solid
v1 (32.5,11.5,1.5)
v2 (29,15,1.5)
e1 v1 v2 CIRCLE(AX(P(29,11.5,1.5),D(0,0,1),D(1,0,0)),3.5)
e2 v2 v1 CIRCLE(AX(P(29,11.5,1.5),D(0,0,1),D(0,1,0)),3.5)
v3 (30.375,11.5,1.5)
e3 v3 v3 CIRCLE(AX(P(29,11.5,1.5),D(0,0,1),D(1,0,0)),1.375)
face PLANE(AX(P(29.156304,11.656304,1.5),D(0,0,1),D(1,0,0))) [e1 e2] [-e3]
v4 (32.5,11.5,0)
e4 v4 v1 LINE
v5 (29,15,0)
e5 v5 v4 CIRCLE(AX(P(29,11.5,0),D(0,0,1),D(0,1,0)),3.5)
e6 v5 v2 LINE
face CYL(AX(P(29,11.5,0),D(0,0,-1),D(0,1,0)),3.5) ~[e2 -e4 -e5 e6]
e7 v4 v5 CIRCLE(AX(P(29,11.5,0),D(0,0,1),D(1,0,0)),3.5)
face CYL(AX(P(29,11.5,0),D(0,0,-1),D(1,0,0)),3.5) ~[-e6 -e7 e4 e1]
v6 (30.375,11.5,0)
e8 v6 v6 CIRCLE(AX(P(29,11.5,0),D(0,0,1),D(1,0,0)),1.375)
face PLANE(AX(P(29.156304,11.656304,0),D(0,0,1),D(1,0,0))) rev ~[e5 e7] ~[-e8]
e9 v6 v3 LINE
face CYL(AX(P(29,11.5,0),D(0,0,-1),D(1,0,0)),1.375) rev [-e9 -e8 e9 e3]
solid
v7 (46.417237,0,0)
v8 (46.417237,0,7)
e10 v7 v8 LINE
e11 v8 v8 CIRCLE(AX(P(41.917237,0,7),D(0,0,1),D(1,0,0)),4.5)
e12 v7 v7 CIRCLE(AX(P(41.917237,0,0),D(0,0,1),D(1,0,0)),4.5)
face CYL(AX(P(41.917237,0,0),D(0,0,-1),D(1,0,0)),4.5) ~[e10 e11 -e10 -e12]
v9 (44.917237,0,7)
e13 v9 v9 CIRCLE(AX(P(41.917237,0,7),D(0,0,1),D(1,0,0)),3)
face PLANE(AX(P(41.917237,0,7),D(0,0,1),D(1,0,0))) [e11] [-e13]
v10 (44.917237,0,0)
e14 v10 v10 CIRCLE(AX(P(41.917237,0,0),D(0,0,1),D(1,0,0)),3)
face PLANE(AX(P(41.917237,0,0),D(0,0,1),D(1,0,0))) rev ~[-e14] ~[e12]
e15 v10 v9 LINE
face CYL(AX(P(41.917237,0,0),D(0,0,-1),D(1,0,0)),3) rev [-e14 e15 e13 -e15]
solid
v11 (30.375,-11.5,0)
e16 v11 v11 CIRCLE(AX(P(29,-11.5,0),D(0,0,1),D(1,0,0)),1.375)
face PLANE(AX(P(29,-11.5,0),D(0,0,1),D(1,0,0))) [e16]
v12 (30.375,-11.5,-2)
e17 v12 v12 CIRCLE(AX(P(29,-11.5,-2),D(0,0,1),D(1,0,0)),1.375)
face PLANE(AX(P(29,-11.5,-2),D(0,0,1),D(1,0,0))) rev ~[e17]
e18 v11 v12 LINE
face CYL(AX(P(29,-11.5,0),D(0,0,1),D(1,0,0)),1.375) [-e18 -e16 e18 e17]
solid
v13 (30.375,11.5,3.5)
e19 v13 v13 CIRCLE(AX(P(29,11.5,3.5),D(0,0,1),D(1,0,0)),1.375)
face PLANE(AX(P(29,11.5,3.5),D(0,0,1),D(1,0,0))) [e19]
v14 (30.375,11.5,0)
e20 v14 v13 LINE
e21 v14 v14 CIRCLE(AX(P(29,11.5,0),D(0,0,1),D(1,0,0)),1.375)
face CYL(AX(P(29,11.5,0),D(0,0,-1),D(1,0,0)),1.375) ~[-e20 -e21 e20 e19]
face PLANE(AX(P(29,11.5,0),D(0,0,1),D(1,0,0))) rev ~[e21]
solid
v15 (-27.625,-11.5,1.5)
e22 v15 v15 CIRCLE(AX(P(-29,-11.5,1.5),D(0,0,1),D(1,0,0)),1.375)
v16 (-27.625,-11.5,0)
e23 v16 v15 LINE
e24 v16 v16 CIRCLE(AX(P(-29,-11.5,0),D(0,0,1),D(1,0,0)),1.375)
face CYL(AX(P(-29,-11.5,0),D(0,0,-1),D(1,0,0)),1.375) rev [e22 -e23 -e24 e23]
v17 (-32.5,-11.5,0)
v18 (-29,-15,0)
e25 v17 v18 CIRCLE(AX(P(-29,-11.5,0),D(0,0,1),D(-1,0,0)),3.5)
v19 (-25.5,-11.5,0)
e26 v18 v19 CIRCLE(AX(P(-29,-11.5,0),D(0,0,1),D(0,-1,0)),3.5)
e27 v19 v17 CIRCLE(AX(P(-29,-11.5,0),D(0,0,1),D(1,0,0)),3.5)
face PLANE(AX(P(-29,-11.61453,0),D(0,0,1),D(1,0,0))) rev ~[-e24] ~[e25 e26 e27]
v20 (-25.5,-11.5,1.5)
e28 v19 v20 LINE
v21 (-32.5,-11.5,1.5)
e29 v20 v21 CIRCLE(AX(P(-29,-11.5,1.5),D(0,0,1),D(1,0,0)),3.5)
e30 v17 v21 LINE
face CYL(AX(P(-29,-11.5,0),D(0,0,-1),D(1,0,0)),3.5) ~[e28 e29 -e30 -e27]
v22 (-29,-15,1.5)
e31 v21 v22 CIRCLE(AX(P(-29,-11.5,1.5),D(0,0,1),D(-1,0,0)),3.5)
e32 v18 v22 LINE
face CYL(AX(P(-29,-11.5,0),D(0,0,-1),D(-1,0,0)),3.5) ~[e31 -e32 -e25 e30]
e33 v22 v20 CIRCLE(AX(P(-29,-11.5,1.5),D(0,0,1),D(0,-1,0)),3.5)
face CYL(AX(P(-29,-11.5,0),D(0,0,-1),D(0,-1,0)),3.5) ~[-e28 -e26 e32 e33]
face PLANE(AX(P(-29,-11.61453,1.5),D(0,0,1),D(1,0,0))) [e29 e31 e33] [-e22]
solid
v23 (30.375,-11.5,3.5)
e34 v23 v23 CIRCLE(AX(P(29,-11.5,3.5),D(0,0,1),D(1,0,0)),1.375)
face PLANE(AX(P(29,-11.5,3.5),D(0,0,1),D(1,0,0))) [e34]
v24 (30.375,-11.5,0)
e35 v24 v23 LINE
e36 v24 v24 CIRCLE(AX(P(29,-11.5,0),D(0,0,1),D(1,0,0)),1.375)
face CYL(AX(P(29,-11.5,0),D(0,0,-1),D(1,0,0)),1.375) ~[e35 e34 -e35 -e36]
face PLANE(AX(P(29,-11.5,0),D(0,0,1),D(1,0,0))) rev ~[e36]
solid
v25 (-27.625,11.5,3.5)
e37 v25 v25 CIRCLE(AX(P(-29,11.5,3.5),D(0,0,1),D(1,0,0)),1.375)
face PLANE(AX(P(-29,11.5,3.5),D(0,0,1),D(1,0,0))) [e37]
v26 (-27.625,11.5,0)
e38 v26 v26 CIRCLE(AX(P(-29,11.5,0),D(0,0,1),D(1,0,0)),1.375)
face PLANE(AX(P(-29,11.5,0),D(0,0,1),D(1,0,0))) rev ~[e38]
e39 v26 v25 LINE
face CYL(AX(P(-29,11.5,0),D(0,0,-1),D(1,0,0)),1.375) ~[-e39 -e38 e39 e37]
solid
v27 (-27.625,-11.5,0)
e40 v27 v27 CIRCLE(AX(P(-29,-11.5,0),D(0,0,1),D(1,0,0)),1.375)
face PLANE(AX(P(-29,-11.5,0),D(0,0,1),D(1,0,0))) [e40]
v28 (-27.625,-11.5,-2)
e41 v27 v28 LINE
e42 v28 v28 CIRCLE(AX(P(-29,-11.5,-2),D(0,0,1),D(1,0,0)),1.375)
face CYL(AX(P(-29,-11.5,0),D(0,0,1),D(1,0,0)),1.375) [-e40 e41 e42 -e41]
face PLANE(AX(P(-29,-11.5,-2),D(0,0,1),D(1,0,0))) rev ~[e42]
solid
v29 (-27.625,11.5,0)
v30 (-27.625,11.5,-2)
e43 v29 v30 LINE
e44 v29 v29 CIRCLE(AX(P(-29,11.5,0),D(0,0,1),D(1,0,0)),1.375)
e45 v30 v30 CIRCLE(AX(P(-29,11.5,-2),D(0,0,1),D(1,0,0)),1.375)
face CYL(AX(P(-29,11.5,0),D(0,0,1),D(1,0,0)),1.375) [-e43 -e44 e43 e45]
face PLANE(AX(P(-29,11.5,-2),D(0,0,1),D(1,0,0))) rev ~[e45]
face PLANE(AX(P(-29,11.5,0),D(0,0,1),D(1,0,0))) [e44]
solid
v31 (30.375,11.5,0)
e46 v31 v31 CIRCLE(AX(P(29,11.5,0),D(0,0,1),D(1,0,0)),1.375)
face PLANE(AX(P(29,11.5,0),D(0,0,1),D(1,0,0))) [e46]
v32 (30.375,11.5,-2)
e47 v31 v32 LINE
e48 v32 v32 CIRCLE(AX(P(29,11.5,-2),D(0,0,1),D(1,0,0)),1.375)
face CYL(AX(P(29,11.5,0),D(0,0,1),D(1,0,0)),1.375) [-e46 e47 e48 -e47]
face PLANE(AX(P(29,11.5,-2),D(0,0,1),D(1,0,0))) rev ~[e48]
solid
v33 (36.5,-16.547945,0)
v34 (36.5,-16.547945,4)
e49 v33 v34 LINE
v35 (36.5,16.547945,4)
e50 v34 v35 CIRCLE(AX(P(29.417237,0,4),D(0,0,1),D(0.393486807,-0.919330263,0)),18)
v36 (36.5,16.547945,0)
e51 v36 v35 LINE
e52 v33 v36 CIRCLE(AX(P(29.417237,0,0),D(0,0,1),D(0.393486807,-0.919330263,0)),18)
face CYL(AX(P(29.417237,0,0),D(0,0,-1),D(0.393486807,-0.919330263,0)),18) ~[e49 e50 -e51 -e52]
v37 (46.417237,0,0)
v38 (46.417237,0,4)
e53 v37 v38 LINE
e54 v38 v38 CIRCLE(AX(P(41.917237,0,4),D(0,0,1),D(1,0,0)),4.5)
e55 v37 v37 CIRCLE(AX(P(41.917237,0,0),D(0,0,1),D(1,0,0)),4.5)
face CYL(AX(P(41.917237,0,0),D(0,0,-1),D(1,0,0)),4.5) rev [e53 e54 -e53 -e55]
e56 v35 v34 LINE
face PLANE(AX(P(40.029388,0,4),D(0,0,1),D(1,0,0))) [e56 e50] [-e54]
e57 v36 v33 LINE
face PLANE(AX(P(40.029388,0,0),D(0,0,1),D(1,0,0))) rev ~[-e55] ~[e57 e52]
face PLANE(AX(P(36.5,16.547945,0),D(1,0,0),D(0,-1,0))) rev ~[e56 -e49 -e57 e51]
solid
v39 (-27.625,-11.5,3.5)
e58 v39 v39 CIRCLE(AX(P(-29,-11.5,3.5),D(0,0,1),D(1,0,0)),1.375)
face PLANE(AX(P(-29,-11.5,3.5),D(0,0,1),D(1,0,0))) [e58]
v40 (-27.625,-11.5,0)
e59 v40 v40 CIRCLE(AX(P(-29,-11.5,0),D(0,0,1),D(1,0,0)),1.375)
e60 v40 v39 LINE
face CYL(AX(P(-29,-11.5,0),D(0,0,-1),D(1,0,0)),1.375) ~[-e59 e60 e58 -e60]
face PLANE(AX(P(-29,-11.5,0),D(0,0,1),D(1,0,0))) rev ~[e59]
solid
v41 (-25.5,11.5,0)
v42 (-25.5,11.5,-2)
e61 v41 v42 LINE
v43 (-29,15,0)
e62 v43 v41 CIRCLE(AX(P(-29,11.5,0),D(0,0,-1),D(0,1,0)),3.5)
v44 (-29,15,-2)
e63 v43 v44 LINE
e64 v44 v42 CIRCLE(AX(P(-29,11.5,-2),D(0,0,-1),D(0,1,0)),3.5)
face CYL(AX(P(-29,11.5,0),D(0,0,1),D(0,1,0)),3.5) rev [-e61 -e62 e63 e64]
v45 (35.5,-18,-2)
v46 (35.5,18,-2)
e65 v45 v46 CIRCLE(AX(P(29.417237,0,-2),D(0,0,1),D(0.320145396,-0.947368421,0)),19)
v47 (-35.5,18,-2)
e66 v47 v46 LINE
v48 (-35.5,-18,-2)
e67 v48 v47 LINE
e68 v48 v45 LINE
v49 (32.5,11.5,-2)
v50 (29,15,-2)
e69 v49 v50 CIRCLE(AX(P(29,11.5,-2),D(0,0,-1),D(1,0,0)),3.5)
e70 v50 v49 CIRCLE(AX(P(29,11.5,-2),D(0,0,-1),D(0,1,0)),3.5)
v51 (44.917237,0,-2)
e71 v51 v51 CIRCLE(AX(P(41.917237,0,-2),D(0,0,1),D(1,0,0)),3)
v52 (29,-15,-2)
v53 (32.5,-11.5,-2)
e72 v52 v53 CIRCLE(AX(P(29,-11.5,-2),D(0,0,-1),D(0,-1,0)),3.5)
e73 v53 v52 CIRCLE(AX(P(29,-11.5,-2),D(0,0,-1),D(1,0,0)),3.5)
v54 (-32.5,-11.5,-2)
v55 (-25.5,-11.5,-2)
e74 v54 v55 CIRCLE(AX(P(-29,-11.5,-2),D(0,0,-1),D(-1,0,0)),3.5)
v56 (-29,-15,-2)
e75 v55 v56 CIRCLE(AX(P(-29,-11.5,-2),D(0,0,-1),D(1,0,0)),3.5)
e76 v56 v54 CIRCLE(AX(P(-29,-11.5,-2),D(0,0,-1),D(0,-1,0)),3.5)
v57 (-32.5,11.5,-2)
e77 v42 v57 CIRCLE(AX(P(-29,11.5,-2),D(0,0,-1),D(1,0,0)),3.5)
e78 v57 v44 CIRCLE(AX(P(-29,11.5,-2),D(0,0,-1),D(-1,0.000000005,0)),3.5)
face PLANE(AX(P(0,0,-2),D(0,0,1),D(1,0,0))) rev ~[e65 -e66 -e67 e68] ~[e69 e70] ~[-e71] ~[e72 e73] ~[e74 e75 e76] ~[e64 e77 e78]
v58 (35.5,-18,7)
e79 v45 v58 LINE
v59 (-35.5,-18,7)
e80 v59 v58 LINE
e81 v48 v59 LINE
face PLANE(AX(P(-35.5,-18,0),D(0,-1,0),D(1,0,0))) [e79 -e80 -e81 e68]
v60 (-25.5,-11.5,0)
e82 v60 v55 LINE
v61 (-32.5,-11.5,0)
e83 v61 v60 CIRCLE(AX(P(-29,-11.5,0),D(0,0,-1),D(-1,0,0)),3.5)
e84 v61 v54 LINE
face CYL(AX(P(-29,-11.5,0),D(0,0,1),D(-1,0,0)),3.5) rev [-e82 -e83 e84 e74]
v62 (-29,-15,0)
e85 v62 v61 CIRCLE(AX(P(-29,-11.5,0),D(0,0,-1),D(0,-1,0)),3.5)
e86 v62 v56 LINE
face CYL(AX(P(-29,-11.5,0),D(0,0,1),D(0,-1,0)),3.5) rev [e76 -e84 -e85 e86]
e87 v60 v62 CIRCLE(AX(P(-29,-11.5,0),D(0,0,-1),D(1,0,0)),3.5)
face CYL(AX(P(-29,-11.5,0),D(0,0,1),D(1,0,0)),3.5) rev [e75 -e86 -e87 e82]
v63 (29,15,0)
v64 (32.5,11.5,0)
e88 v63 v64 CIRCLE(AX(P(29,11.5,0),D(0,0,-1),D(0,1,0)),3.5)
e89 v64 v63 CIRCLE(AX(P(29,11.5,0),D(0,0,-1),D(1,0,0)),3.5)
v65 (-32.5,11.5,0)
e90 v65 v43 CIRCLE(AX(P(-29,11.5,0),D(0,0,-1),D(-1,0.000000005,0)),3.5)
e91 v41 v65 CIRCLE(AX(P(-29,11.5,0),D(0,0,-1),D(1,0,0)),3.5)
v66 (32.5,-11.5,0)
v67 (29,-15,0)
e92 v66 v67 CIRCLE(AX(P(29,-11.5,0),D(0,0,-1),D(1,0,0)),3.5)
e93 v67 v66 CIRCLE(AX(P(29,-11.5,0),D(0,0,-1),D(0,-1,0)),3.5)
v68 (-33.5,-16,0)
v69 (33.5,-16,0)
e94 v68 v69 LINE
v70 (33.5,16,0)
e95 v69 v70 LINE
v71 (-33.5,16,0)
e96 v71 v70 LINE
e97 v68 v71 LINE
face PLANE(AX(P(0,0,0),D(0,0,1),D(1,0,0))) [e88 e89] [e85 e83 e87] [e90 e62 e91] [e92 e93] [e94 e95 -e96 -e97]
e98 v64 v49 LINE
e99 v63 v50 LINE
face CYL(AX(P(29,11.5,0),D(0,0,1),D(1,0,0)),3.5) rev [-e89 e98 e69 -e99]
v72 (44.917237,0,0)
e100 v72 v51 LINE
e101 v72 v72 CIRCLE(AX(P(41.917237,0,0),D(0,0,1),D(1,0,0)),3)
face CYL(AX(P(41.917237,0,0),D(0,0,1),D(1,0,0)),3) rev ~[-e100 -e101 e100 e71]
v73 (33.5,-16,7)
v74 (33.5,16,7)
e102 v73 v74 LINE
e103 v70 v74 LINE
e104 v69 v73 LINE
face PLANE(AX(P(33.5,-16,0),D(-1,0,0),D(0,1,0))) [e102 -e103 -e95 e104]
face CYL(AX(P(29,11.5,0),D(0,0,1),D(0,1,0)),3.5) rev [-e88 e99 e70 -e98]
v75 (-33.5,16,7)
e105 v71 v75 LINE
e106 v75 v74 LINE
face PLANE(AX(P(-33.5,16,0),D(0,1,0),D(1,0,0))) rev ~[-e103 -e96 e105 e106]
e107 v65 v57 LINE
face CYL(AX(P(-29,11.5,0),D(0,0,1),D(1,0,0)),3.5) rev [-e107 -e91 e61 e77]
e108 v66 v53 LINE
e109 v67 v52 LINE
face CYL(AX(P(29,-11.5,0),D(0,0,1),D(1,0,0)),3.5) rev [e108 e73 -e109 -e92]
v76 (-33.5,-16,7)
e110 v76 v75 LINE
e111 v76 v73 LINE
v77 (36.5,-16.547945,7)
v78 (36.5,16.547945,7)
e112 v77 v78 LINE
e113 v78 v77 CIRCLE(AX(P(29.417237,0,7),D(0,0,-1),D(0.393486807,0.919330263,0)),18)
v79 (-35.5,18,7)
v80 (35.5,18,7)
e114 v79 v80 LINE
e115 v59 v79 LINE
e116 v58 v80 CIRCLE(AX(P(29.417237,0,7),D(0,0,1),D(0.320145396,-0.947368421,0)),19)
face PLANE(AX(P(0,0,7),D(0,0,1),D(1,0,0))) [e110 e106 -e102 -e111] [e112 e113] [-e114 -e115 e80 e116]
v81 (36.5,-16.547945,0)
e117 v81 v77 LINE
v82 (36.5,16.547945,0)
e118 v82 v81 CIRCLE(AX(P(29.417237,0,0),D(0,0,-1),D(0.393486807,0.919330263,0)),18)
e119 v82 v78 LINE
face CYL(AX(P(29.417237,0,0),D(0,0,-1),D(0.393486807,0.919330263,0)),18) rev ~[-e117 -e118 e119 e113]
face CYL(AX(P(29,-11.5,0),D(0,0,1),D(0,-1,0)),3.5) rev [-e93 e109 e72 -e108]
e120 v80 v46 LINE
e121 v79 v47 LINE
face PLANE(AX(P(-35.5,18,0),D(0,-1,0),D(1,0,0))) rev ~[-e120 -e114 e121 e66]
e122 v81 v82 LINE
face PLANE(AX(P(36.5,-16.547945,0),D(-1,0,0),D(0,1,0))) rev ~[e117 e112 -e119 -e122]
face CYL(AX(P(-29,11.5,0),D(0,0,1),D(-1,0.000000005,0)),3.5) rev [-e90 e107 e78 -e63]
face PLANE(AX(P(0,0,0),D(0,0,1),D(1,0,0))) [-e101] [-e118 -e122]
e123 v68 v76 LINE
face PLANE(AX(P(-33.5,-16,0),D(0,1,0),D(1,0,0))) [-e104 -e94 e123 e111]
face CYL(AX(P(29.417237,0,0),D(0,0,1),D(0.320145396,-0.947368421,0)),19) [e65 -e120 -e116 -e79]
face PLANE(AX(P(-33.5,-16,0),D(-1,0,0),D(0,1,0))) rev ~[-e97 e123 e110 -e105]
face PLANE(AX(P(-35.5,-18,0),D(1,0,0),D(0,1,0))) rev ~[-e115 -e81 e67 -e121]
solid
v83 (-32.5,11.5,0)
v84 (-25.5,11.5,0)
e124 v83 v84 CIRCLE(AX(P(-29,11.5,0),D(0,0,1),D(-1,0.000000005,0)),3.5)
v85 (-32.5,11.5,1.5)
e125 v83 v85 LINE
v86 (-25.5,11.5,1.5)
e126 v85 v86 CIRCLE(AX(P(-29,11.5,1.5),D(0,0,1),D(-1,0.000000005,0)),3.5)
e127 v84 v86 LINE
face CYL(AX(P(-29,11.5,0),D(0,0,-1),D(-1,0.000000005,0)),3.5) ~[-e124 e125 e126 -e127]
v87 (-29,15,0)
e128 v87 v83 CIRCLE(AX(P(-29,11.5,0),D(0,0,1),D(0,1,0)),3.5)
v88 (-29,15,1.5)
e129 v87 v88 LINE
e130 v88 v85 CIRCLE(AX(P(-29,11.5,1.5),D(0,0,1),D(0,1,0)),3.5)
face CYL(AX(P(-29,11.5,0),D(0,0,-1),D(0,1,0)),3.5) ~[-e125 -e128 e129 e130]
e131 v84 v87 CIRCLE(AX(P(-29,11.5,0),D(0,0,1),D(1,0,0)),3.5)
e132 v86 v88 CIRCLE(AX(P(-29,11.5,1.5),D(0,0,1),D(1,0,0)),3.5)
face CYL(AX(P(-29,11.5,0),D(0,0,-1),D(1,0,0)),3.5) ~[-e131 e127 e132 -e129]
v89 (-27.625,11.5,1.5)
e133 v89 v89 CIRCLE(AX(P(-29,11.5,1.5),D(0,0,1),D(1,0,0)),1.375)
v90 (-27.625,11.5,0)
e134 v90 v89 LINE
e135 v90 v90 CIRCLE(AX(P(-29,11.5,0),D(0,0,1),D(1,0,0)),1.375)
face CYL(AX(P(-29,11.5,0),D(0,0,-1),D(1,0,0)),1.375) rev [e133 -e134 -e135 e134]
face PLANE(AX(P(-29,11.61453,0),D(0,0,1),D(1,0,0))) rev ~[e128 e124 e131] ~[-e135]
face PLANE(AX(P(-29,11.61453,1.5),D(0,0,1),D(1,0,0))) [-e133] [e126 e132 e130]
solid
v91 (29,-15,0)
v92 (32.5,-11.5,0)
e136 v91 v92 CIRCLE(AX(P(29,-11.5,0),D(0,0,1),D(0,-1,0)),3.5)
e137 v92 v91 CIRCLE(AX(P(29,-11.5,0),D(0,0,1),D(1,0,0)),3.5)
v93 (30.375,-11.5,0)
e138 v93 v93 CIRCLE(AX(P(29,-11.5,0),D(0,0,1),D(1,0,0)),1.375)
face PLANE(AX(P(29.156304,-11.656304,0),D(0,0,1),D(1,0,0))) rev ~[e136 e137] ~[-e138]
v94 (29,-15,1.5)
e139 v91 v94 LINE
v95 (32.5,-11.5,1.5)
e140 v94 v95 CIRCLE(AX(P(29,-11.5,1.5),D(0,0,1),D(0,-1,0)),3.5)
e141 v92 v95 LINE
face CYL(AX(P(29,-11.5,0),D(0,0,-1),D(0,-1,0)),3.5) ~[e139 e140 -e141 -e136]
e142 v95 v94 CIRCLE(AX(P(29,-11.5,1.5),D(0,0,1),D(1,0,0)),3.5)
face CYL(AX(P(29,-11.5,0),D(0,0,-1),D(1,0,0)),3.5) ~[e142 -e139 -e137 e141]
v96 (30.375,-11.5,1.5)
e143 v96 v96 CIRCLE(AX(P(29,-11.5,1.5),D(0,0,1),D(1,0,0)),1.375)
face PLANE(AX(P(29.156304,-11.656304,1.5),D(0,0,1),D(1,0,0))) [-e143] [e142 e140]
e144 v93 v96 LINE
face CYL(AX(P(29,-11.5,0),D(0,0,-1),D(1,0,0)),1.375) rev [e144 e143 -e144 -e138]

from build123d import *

# Parameters (mm, degrees)
F0_W     = 71
F0_H     = 36
F0_W_2   = 67
F0_H_2   = 32
F1_DEPTH = 7
F0_R     = 4.5
F0_R_2   = 3
F2_DEPTH = 2
F0_R_3   = 1.375
F3_DEPTH = 3.5
F4_DEPTH = 1.5
F5_DEPTH = 4


with BuildPart() as f1:
    # F0 (on Top) → F1 (new body)
    with BuildSketch(Plane.XY):
        Rectangle(F0_W, F0_H)
        Rectangle(F0_W_2, F0_H_2, mode=Mode.SUBTRACT)
        with BuildLine():
            ThreePointArc((35.5, -18), (48.4172374697, 0), (35.5, 18))
            Line((35.5, 18), (35.5, -18))
        make_face()
        with BuildLine():
            ThreePointArc((36.5, 16.5479447346), (47.4172374697, 0), (36.5, -16.5479447346))
            Line((36.5, -16.5479447346), (36.5, 16.5479447346))
        make_face(mode=Mode.SUBTRACT)
    extrude(amount=F1_DEPTH)

    # F0 (on Top) → F2 (join)
    with BuildSketch(Plane.XY):
        Rectangle(F0_W, F0_H)
        Rectangle(F0_W_2, F0_H_2, mode=Mode.SUBTRACT)
        Rectangle(F0_W_2, F0_H_2)
        Polygon((32.5, -11.5), (32.5, -15), (29, -15), (-29, -15), (-32.5, -15), (-32.5, -11.5), (-32.5, 11.5000000158), (-32.5, 15), (-29, 15), (29, 15), (32.5, 15), (32.5, 11.5), align=None, mode=Mode.SUBTRACT)
        with BuildLine():
            Line((-29, -15), (29, -15))
            ThreePointArc((29, -15), (26.5251262658, -9.0251262658), (32.5, -11.5))
            Line((32.5, -11.5), (32.5, 11.5))
            ThreePointArc((32.5, 11.5), (26.5251262658, 9.0251262658), (29, 15))
            Line((29, 15), (-29, 15))
            ThreePointArc((-29, 15), (-26.5251262658, 13.9748737342), (-25.5, 11.5))
            ThreePointArc((-25.5, 11.5), (-29.0000000079, 8), (-32.5, 11.5000000158))
            Line((-32.5, 11.5000000158), (-32.5, -11.5))
            ThreePointArc((-32.5, -11.5), (-29, -8), (-25.5, -11.5))
            ThreePointArc((-25.5, -11.5), (-26.5251262658, -13.9748737342), (-29, -15))
        make_face()
        with BuildLine():
            ThreePointArc((35.5, -18), (48.4172374697, 0), (35.5, 18))
            Line((35.5, 18), (35.5, -18))
        make_face()
        with BuildLine():
            ThreePointArc((36.5, 16.5479447346), (47.4172374697, 0), (36.5, -16.5479447346))
            Line((36.5, -16.5479447346), (36.5, 16.5479447346))
        make_face(mode=Mode.SUBTRACT)
        with BuildLine():
            Line((36.5, 16.5479447346), (36.5, -16.5479447346))
            ThreePointArc((36.5, -16.5479447346), (47.4172374697, 0), (36.5, 16.5479447346))
        make_face()
        with Locations((41.9172374697, 0)):
            Circle(F0_R, mode=Mode.SUBTRACT)
        with Locations((41.9172374697, 0)):
            Circle(F0_R)
        with Locations((41.9172374697, 0)):
            Circle(F0_R_2, mode=Mode.SUBTRACT)
        with BuildLine():
            Line((29, -15), (32.5, -15))
            Line((32.5, -15), (32.5, -11.5))
            ThreePointArc((32.5, -11.5), (31.4748737342, -13.9748737342), (29, -15))
        make_face()
        with BuildLine():
            Line((-32.5, -15), (-29, -15))
            ThreePointArc((-29, -15), (-31.4748737342, -13.9748737342), (-32.5, -11.5))
            Line((-32.5, -11.5), (-32.5, -15))
        make_face()
        with BuildLine():
            Line((-32.5, 15), (-32.5, 11.5000000158))
            ThreePointArc((-32.5, 11.5000000158), (-31.4748737286, 13.9748737397), (-29, 15))
            Line((-29, 15), (-32.5, 15))
        make_face()
        with BuildLine():
            ThreePointArc((29, 15), (31.4748737342, 13.9748737342), (32.5, 11.5))
            Line((32.5, 11.5), (32.5, 15))
            Line((32.5, 15), (29, 15))
        make_face()
    extrude(amount=-F2_DEPTH)


with BuildPart() as f1b:
    # F0 (on Top) → F1, piece 2 (new body)
    with BuildSketch(Plane.XY):
        with Locations((41.9172374697, 0)):
            Circle(F0_R)
        with Locations((41.9172374697, 0)):
            Circle(F0_R_2, mode=Mode.SUBTRACT)
    extrude(amount=F1_DEPTH)


with BuildPart() as f2:
    # F0 (on Top) → F2, piece 2 (new body)
    with BuildSketch(Plane.XY):
        with Locations((29, -11.5)):
            Circle(F0_R_3)
    extrude(amount=-F2_DEPTH)


with BuildPart() as f2b:
    # F0 (on Top) → F2, piece 3 (new body)
    with BuildSketch(Plane.XY):
        with Locations((29, 11.5)):
            Circle(F0_R_3)
    extrude(amount=-F2_DEPTH)


with BuildPart() as f2c:
    # F0 (on Top) → F2, piece 4 (new body)
    with BuildSketch(Plane.XY):
        with Locations((-29, -11.5)):
            Circle(F0_R_3)
    extrude(amount=-F2_DEPTH)


with BuildPart() as f2d:
    # F0 (on Top) → F2, piece 5 (new body)
    with BuildSketch(Plane.XY):
        with Locations((-29, 11.5)):
            Circle(F0_R_3)
    extrude(amount=-F2_DEPTH)


with BuildPart() as f3:
    # F0 (on Top) → F3 (new body)
    with BuildSketch(Plane.XY):
        with Locations((29, 11.5)):
            Circle(F0_R_3)
    extrude(amount=F3_DEPTH)


with BuildPart() as f3b:
    # F0 (on Top) → F3, piece 2 (new body)
    with BuildSketch(Plane.XY):
        with Locations((29, -11.5)):
            Circle(F0_R_3)
    extrude(amount=F3_DEPTH)


with BuildPart() as f3c:
    # F0 (on Top) → F3, piece 3 (new body)
    with BuildSketch(Plane.XY):
        with Locations((-29, -11.5)):
            Circle(F0_R_3)
    extrude(amount=F3_DEPTH)


with BuildPart() as f3d:
    # F0 (on Top) → F3, piece 4 (new body)
    with BuildSketch(Plane.XY):
        with Locations((-29, 11.5)):
            Circle(F0_R_3)
    extrude(amount=F3_DEPTH)


with BuildPart() as f4:
    # F0 (on Top) → F4 (new body)
    with BuildSketch(Plane.XY):
        with BuildLine():
            ThreePointArc((-29, 15), (-31.4748737286, 13.9748737397), (-32.5, 11.5000000158))
            ThreePointArc((-32.5, 11.5000000158), (-29.0000000079, 8), (-25.5, 11.5))
            ThreePointArc((-25.5, 11.5), (-26.5251262658, 13.9748737342), (-29, 15))
        make_face()
        with Locations((-29, 11.5)):
            Circle(F0_R_3, mode=Mode.SUBTRACT)
    extrude(amount=F4_DEPTH)


with BuildPart() as f4b:
    # F0 (on Top) → F4, piece 2 (new body)
    with BuildSketch(Plane.XY):
        with BuildLine():
            ThreePointArc((29, 15), (26.5251262658, 9.0251262658), (32.5, 11.5))
            ThreePointArc((32.5, 11.5), (31.4748737342, 13.9748737342), (29, 15))
        make_face()
        with Locations((29, 11.5)):
            Circle(F0_R_3, mode=Mode.SUBTRACT)
    extrude(amount=F4_DEPTH)


with BuildPart() as f4c:
    # F0 (on Top) → F4, piece 3 (new body)
    with BuildSketch(Plane.XY):
        with BuildLine():
            ThreePointArc((32.5, -11.5), (26.5251262658, -9.0251262658), (29, -15))
            ThreePointArc((29, -15), (31.4748737342, -13.9748737342), (32.5, -11.5))
        make_face()
        with Locations((29, -11.5)):
            Circle(F0_R_3, mode=Mode.SUBTRACT)
    extrude(amount=F4_DEPTH)


with BuildPart() as f4d:
    # F0 (on Top) → F4, piece 4 (new body)
    with BuildSketch(Plane.XY):
        with BuildLine():
            ThreePointArc((-32.5, -11.5), (-31.4748737342, -13.9748737342), (-29, -15))
            ThreePointArc((-29, -15), (-26.5251262658, -13.9748737342), (-25.5, -11.5))
            ThreePointArc((-25.5, -11.5), (-29, -8), (-32.5, -11.5))
        make_face()
        with Locations((-29, -11.5)):
            Circle(F0_R_3, mode=Mode.SUBTRACT)
    extrude(amount=F4_DEPTH)


with BuildPart() as f5:
    # F0 (on Top) → F5 (new body)
    with BuildSketch(Plane.XY):
        with BuildLine():
            Line((36.5, 16.5479447346), (36.5, -16.5479447346))
            ThreePointArc((36.5, -16.5479447346), (47.4172374697, 0), (36.5, 16.5479447346))
        make_face()
        with Locations((41.9172374697, 0)):
            Circle(F0_R, mode=Mode.SUBTRACT)
    extrude(amount=F5_DEPTH)


solid = Compound([f1.part, f1b.part, f2.part, f2b.part, f2c.part, f2d.part, f3.part, f3b.part, f3c.part, f3d.part, f4.part, f4b.part, f4c.part, f4d.part, f5.part])
